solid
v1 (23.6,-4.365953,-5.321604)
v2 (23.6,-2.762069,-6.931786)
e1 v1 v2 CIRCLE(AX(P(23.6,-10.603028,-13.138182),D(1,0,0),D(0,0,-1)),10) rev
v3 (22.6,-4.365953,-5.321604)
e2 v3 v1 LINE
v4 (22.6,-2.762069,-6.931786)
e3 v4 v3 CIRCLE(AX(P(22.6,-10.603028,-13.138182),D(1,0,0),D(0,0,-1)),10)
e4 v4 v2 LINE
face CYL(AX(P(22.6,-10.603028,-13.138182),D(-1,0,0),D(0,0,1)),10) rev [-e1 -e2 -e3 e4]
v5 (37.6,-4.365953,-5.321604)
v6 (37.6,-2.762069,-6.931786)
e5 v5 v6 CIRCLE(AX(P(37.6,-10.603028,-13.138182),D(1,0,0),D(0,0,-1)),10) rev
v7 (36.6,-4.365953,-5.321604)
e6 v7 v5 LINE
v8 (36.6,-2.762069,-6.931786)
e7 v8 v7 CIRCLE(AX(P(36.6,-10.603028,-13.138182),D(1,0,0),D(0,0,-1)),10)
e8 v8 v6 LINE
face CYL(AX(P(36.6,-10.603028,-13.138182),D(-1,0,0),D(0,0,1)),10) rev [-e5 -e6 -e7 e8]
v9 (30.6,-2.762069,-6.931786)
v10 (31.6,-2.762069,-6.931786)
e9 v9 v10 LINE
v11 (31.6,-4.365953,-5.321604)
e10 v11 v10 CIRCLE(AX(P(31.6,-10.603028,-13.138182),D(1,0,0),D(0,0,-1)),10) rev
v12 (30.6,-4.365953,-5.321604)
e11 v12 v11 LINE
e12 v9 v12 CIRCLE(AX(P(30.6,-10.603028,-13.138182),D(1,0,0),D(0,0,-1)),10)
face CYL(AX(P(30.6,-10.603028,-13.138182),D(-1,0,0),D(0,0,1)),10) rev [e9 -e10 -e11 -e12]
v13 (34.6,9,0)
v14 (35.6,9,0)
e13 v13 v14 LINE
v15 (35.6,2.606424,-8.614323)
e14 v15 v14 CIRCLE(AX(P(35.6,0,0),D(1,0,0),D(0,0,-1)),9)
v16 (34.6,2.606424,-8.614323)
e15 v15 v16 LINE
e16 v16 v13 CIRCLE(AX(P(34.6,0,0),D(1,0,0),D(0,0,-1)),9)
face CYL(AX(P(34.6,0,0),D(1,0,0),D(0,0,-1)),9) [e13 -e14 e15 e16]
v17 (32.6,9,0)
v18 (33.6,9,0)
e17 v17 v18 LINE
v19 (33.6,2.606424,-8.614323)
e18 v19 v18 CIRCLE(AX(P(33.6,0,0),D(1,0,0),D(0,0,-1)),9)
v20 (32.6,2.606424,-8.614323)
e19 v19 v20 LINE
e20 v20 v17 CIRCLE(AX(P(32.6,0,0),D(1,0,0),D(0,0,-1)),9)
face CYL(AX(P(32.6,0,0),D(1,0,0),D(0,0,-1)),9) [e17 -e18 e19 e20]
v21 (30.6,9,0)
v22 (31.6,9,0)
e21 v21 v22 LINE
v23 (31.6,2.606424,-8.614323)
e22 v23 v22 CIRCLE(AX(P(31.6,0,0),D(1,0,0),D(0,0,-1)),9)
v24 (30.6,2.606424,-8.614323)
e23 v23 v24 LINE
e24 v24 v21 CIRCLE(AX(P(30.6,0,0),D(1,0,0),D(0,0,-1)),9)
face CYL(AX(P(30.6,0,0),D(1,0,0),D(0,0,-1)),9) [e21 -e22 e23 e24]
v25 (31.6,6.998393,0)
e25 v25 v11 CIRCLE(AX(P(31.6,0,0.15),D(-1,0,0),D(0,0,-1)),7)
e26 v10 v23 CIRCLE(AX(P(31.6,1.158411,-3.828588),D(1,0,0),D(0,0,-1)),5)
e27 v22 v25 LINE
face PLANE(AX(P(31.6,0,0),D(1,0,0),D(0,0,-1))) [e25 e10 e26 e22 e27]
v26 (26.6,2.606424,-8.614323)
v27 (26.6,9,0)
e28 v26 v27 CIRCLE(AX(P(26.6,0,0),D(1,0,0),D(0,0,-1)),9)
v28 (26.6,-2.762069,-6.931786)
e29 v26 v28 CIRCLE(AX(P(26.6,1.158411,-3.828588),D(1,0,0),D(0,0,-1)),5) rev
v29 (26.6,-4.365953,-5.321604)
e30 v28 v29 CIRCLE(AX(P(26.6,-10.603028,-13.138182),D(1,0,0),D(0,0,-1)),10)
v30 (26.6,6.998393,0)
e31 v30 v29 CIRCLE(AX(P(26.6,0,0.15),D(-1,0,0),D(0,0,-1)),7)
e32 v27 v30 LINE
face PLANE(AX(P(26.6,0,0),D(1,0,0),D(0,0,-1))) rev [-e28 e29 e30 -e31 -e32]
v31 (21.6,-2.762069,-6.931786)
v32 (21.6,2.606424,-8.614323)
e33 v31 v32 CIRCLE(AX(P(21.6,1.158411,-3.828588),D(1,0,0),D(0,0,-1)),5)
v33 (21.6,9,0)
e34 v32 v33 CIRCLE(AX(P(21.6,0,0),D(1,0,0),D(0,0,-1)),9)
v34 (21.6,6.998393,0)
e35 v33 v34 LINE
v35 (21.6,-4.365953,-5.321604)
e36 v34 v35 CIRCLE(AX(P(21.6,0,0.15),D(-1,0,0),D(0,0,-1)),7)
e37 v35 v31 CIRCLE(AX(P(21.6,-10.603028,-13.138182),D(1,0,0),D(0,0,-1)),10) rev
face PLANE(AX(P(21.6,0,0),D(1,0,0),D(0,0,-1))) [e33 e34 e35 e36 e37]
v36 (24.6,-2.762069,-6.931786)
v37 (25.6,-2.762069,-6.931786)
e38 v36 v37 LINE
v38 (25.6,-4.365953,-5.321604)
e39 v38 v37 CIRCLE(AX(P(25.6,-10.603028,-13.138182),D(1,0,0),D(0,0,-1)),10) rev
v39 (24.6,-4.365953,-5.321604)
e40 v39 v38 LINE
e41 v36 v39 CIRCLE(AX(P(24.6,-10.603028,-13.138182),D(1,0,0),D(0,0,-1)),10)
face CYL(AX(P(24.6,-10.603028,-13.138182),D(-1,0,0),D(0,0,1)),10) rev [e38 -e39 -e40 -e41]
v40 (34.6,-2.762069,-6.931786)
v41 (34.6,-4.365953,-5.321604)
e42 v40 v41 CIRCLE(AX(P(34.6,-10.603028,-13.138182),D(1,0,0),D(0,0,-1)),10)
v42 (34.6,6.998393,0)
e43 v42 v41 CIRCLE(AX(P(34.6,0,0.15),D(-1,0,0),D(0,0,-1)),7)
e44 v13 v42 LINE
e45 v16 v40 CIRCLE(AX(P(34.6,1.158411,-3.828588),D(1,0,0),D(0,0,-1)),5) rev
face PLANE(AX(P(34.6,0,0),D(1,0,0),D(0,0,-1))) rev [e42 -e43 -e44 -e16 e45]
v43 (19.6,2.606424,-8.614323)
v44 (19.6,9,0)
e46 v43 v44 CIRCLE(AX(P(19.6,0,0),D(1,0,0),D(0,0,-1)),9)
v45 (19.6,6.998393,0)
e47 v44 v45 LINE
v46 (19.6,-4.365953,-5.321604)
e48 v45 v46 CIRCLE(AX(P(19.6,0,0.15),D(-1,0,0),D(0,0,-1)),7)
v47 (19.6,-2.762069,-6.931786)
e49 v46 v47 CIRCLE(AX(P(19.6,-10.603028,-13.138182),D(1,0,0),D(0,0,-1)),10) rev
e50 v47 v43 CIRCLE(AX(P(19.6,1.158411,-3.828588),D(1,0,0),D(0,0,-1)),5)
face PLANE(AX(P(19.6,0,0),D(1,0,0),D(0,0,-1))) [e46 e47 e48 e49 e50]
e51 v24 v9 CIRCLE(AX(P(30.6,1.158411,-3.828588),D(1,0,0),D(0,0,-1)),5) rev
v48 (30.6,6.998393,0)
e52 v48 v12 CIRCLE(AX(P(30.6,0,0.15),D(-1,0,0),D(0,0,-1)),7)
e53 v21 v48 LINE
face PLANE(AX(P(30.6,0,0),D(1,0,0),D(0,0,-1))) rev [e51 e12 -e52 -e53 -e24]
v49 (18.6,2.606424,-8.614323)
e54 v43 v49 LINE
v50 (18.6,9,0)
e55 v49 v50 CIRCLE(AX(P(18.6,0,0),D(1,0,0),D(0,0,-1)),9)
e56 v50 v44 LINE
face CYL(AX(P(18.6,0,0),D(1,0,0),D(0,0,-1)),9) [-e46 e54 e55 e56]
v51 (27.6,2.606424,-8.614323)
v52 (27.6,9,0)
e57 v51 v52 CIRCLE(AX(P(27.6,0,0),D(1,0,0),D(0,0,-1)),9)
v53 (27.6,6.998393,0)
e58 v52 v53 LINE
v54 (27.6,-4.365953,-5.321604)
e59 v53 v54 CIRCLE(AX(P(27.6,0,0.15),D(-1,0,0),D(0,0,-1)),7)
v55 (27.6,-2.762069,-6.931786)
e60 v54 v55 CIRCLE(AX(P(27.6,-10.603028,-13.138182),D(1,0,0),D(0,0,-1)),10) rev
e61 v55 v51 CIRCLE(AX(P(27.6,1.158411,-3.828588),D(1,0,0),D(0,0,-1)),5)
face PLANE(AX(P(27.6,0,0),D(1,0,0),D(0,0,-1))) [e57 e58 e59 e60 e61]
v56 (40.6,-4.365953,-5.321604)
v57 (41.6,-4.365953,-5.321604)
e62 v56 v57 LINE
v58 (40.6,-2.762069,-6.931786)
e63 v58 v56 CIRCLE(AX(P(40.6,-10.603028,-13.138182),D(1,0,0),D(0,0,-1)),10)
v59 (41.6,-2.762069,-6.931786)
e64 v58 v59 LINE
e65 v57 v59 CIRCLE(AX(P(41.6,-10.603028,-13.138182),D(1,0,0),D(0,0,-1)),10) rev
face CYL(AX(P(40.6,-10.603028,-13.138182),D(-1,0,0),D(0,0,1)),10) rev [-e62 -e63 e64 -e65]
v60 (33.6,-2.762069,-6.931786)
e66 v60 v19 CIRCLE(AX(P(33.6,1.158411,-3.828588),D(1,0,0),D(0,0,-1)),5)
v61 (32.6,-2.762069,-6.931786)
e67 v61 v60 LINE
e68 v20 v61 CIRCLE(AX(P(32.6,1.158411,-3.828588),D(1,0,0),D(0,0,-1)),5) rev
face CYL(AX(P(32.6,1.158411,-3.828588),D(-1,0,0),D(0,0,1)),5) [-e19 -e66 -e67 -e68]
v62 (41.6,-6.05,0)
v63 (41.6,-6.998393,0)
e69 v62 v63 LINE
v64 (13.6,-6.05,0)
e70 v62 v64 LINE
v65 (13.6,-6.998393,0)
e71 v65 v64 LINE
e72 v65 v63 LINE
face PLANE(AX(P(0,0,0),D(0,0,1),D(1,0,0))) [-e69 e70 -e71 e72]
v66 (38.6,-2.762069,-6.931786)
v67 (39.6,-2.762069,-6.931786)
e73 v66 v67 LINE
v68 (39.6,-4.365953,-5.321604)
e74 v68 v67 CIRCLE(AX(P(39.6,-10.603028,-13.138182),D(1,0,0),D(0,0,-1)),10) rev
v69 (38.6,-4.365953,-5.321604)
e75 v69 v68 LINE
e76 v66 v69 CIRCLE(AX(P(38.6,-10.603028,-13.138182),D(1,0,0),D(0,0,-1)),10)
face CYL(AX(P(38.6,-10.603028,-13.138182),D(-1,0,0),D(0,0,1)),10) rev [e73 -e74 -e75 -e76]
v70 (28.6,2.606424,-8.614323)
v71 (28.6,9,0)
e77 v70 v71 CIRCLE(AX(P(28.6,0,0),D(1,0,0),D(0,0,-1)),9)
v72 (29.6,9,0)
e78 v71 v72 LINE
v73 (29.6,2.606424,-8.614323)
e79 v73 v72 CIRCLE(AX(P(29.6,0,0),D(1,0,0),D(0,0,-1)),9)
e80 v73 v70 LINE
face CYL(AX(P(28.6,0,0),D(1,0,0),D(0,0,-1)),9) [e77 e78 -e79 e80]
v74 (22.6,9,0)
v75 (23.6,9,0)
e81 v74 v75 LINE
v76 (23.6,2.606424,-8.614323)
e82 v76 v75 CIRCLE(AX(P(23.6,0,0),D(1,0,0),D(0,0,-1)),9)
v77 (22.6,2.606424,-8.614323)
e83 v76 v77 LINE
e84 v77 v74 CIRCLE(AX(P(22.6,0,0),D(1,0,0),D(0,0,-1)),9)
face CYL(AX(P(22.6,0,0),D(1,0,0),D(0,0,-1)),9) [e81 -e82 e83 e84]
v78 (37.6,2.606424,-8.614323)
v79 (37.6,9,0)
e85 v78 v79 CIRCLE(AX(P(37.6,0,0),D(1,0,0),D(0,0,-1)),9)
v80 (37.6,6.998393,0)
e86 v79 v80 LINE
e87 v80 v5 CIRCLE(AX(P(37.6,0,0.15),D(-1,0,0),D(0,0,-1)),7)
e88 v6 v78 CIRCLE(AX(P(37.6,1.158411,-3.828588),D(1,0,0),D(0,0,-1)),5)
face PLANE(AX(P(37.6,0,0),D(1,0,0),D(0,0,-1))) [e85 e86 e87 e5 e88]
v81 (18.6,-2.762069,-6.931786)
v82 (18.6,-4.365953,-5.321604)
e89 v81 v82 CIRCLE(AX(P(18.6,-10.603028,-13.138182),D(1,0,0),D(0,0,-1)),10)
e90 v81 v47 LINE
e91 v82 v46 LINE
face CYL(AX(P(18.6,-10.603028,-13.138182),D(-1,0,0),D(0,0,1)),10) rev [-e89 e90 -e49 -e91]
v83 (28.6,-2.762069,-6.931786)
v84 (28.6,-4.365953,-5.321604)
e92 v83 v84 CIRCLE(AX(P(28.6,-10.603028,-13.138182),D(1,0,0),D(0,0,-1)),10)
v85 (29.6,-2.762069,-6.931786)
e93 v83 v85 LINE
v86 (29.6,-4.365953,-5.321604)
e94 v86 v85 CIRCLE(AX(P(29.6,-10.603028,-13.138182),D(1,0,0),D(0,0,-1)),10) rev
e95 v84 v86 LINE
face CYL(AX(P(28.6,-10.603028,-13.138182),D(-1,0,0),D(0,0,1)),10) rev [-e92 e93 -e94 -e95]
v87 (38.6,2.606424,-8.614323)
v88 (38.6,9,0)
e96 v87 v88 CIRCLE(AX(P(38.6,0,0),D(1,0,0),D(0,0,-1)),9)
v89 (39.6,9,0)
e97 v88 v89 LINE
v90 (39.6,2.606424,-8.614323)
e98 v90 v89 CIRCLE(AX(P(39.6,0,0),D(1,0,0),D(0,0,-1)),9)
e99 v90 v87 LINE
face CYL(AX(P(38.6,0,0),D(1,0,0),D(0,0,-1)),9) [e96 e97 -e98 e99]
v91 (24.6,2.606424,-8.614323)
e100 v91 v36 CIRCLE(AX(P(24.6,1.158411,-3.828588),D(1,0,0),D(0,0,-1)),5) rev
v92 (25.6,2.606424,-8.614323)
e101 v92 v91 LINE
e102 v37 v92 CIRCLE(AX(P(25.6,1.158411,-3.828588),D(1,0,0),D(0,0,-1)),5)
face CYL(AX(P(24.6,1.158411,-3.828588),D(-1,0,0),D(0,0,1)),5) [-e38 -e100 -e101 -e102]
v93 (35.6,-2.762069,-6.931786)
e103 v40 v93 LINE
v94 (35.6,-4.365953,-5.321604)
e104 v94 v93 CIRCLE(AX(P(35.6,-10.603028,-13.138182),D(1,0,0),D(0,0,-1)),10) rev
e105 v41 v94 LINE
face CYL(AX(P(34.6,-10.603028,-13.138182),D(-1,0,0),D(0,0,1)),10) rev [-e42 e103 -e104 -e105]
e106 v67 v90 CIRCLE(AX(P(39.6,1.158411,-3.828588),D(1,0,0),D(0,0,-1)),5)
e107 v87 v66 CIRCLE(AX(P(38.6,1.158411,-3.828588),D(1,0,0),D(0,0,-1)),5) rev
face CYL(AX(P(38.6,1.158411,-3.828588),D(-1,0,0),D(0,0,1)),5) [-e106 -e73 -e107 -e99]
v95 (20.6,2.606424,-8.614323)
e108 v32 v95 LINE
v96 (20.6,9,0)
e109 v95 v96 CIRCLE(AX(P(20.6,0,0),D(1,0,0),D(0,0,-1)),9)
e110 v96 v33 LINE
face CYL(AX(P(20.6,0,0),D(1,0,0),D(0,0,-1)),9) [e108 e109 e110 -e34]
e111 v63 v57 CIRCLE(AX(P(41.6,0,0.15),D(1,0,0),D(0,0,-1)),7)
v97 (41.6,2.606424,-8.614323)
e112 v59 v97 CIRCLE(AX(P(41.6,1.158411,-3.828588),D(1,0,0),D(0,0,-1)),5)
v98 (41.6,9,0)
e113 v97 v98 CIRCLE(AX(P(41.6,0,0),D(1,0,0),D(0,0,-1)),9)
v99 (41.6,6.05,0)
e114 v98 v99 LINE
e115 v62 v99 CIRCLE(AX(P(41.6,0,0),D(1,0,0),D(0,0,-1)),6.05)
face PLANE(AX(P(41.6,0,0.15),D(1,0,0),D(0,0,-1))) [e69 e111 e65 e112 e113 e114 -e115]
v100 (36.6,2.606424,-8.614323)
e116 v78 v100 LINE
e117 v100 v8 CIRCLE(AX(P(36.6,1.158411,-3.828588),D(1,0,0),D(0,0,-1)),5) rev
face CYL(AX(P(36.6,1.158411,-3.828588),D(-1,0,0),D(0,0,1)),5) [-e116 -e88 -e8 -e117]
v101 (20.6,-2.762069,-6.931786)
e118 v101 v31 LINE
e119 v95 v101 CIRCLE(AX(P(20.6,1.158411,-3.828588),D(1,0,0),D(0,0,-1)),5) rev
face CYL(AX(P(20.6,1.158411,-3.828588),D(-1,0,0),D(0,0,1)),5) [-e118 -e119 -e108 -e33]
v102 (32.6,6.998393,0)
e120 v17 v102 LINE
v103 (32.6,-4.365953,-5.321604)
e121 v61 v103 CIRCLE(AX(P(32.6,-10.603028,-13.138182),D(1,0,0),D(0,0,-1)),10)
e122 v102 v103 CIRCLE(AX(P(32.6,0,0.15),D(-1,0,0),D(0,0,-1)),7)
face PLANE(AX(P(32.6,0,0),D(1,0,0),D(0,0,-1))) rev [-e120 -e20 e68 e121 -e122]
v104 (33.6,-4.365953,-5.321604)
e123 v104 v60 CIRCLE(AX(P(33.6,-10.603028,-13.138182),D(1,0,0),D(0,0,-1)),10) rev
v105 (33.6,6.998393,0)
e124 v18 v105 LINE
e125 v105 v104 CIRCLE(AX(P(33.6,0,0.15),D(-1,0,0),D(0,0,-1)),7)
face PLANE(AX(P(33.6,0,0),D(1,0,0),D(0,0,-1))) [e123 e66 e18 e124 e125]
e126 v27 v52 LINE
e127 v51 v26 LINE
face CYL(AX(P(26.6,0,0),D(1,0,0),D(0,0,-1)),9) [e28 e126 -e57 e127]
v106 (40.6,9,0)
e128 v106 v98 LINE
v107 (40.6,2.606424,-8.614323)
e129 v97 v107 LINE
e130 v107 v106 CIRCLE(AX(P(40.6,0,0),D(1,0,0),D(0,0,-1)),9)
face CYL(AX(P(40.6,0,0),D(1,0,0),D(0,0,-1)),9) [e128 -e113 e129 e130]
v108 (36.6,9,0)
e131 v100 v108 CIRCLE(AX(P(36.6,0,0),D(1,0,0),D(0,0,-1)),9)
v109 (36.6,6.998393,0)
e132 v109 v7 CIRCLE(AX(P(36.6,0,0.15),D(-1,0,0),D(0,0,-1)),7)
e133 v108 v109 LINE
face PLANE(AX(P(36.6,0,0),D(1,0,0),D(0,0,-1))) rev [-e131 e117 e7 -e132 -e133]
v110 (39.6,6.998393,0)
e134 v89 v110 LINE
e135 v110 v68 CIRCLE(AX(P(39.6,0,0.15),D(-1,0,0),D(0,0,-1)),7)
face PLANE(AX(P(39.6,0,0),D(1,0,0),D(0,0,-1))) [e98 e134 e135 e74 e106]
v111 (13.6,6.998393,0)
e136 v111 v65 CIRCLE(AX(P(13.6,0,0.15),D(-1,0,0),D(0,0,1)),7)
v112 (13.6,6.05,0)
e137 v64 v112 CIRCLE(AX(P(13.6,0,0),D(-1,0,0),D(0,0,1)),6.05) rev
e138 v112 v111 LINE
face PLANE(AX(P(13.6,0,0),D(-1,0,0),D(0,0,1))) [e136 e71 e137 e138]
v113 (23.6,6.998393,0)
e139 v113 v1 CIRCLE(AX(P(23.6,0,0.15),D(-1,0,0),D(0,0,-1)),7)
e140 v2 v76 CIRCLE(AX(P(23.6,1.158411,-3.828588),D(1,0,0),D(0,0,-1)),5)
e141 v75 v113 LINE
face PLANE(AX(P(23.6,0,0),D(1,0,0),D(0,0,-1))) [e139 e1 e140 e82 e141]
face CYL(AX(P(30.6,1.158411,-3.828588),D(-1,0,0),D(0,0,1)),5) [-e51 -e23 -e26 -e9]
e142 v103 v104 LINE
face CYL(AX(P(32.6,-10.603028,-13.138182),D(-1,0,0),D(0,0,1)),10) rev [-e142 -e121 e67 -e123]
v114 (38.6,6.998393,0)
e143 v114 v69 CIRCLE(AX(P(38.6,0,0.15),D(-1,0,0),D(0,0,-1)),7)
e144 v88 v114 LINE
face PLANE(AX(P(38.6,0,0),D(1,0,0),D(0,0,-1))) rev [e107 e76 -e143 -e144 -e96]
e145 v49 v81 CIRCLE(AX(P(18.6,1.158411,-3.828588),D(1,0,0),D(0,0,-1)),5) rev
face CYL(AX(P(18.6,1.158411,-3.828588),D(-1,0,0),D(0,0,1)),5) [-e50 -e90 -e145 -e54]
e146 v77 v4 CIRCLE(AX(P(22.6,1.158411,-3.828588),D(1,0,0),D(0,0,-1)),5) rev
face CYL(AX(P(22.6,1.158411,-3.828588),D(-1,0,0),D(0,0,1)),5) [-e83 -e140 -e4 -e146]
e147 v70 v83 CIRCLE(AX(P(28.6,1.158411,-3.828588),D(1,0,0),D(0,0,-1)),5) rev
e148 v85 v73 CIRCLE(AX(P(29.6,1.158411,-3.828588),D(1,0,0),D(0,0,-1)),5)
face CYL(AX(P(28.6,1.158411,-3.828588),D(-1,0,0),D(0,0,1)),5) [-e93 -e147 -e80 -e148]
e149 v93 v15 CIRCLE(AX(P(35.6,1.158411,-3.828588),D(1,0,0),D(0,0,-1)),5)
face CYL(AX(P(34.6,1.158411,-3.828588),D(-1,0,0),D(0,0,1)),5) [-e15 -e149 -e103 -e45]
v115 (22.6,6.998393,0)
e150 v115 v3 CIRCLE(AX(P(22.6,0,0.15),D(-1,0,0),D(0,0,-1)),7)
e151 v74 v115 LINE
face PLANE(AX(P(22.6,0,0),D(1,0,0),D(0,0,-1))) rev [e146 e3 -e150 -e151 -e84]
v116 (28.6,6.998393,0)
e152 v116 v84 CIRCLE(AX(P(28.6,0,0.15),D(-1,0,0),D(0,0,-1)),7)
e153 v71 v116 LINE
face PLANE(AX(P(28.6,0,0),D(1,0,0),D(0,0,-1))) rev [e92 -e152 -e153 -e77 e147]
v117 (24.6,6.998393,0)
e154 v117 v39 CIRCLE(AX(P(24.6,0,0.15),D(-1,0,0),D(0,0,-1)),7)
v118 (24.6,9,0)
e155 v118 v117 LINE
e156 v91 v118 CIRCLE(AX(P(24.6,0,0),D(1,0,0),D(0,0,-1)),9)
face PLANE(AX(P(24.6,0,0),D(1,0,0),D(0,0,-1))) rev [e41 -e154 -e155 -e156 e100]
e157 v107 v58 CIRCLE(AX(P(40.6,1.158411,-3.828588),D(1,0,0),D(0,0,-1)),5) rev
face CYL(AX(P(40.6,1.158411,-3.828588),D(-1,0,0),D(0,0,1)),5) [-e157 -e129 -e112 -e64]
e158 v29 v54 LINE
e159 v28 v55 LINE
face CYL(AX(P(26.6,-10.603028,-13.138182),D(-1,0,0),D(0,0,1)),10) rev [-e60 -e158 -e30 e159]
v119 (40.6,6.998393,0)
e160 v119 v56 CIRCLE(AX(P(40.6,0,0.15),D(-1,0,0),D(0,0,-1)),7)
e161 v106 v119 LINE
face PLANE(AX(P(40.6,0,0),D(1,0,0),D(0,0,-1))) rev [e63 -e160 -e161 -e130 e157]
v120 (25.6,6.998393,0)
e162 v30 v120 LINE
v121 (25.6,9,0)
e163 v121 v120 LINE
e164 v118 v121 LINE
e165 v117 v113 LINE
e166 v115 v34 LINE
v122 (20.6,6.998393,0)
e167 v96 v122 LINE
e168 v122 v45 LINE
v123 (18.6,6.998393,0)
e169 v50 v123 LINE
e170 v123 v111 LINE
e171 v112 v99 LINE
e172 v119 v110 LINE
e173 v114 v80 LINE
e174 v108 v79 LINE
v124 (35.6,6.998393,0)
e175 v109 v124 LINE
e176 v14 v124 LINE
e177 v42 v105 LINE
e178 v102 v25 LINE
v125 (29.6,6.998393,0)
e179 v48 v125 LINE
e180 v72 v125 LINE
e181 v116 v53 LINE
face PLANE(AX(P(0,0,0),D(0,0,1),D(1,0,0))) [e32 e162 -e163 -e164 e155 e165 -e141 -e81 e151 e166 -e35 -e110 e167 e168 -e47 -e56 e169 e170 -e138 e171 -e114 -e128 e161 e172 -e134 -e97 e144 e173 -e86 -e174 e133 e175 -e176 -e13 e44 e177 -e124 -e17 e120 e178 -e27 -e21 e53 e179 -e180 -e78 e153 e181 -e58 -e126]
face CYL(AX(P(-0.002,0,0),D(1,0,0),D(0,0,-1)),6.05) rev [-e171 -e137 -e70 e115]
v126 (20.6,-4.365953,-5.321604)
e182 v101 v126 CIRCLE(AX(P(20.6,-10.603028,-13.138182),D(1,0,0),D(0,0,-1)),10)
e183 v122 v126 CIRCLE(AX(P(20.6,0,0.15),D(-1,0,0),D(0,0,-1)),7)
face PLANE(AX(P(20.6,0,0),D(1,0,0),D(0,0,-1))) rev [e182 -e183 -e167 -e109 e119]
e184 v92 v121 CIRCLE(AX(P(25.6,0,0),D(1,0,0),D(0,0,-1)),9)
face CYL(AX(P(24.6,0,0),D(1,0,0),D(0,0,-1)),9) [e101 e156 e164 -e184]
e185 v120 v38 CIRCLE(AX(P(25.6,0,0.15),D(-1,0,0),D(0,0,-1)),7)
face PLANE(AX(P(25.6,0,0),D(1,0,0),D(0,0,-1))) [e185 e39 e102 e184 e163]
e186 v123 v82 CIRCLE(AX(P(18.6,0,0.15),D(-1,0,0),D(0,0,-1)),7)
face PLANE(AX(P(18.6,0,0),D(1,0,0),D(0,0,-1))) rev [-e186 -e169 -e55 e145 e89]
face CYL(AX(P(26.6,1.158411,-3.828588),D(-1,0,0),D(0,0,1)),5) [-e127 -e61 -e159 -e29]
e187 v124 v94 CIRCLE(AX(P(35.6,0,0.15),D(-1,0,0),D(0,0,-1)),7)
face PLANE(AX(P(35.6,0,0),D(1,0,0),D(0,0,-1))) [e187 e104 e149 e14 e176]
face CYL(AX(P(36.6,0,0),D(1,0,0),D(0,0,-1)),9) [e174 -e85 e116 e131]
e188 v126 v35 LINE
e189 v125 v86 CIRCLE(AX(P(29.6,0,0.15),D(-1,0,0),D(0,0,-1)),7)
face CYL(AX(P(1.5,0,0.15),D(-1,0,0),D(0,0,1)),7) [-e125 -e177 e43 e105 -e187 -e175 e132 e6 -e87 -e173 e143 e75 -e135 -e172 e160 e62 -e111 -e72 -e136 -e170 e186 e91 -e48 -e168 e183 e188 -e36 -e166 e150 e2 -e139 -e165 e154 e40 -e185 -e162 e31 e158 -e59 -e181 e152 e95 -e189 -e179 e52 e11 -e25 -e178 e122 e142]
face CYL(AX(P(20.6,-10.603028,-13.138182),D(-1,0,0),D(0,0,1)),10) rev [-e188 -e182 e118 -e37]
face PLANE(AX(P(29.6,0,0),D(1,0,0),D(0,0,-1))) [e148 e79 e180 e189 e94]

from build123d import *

# Parameters (mm, degrees)
SKETCH1_R           = 7
SKETCH1_R_2         = 0.8
SKETCH1_R_3         = 4
BOSS_EXTRUDE1_DEPTH = 1.5
SKETCH2_R           = 7
SKETCH2_R_2         = 6.4
BOSS_EXTRUDE2_DEPTH = 40.1
BOSS_EXTRUDE5_REACH = 44.786
SKETCH12_R          = 6.4
SKETCH12_R_2        = 6.05
BOSS_EXTRUDE7_START = -1
BOSS_EXTRUDE7_DEPTH = 1
FILLET2_R           = 10
FILLET3_R           = 5
LPATTERN1_START     = 18.6
LPATTERN1_DEPTH     = 1
LPATTERN1_START_2   = 20.6
LPATTERN1_2_DEPTH   = 1
LPATTERN1_START_3   = 22.6
LPATTERN1_3_DEPTH   = 1
LPATTERN1_START_4   = 24.6
LPATTERN1_4_DEPTH   = 1
LPATTERN1_START_5   = 26.6
LPATTERN1_5_DEPTH   = 1
LPATTERN1_START_6   = 28.6
LPATTERN1_6_DEPTH   = 1
LPATTERN1_START_7   = 30.6
LPATTERN1_7_DEPTH   = 1
LPATTERN1_START_8   = 32.6
LPATTERN1_8_DEPTH   = 1
LPATTERN1_START_9   = 34.6
LPATTERN1_9_DEPTH   = 1
LPATTERN1_START_10  = 36.6
LPATTERN1_10_DEPTH  = 1
LPATTERN1_START_11  = 38.6
LPATTERN1_11_DEPTH  = 1
SKETCH15_W          = 17.693531028
SKETCH15_H          = 16
SKETCH16_W          = 28
SKETCH16_H          = 16


with BuildPart() as part:
    # Sketch1 → Boss-Extrude1 (new body)
    with BuildSketch(Plane(origin=(0, 0, 0), x_dir=(0, 0, -1), z_dir=(1, 0, 0))):
        with Locations((-0.15, 0)):
            Circle(SKETCH1_R)
        with Locations((0, 5)):
            Circle(SKETCH1_R_2, mode=Mode.SUBTRACT)
        with Locations((-4.330127019, -2.5)):
            Circle(SKETCH1_R_2, mode=Mode.SUBTRACT)
        with Locations((4.330127019, -2.5)):
            Circle(SKETCH1_R_2, mode=Mode.SUBTRACT)
        Circle(SKETCH1_R_3, mode=Mode.SUBTRACT)
    extrude(amount=BOSS_EXTRUDE1_DEPTH)

    # Sketch2 → Boss-Extrude2 (add)
    with BuildSketch(Plane(origin=(1.5, 0, 0), x_dir=(0, 0, -1), z_dir=(1, 0, 0))):
        with Locations((-0.15, 0)):
            Circle(SKETCH2_R)
        with Locations((-0.15, 0)):
            Circle(SKETCH2_R_2, mode=Mode.SUBTRACT)
    extrude(amount=BOSS_EXTRUDE2_DEPTH)

    # Sketch12 → Boss-Extrude5 (add, up to next)
    with BuildSketch(Plane(origin=(41.6, 0, 0), x_dir=(0, 0, -1), z_dir=(1, 0, 0)), mode=Mode.PRIVATE) as boss_extrude5_sk1:
        with Locations((-0.15, 0)):
            Circle(SKETCH12_R)
        Circle(SKETCH12_R_2, mode=Mode.SUBTRACT)
    boss_extrude5_tool1 = extrude(boss_extrude5_sk1.sketch, amount=-BOSS_EXTRUDE5_REACH, mode=Mode.PRIVATE) - part.part
    add(boss_extrude5_tool1.solids().sort_by_distance((41.6, 0, 6.368981))[0])

    # Sketch14 → Boss-Extrude7 (add)
    with BuildSketch(Plane(origin=(41.6, 0, 0), x_dir=(0, 0, -1), z_dir=(1, 0, 0)).offset(BOSS_EXTRUDE7_START)):
        with BuildLine():
            Line((-7.039083492, -1.241180339), (-8.863269777, -1.562833599))
            ThreePointArc((-8.863269777, -1.562833599), (0, 9), (8.863269777, -1.562833599))
            Line((8.863269777, -1.562833599), (6.748129599, -1.189877318))
            ThreePointArc((6.748129599, -1.189877318), (-0.176047227, 6.999951539), (-7.039083492, -1.241180339))
        make_face()
    extrude(amount=BOSS_EXTRUDE7_DEPTH)

    # Fillet2
    # the kernel refuses this fillet: 10 mm, written as the material it adds along each edge
    with BuildSketch(Plane(origin=(40.6, -1.189877318, -6.748129599), x_dir=(0, -0.9122124275498226, 0.40971756982543417), z_dir=(1, 0, 0))) as fillet2_piece_1:
        with BuildLine():
            CenterArc((5.968676638, 9.685818843), FILLET2_R, 229.495547536, 26.104158306)
            Line((-0.526394739, 2.082263897), (-0.656296166, 1.930192799))
            ThreePointArc((-0.656296166, 1.930192799), (-0.457097485, 0.992114146), (-0.193900116, -0.049017803))
            Line((-0.193900116, -0.049017803), (0.049738972, -0.193716377))
            ThreePointArc((0.049738972, -0.193716377), (1.740864019, 0.01992681), (3.431989067, -0.193716377))
            Line((3.431989067, -0.193716377), (3.481728039, 0))
        make_face()
    extrude(amount=1)
    with BuildSketch(Plane(origin=(40.6, -1.241180339, 7.039083492), x_dir=(0, -0.9145376119425217, -0.4045008731047063), z_dir=(1, 0, 0))) as fillet2_piece_2:
        with BuildLine():
            CenterArc((5.662402917, -9.717692138), FILLET2_R, 103.646653122, 23.987142505)
            Line((-0.443720941, -1.798395993), (-0.565843418, -1.64001007))
            ThreePointArc((-0.565843418, -1.64001007), (-0.416037384, -0.851288435), (-0.194176914, 0.047909561))
            Line((-0.194176914, 0.047909561), (0.047186691, 0.194353843))
            ThreePointArc((0.047186691, 0.194353843), (1.651534184, 0.002384497), (3.255881677, 0.194353843))
            Line((3.255881677, 0.194353843), (3.303068368, 0))
        make_face()
    extrude(amount=1)

    # Fillet3
    fillet3_edges = [part.edges().sort_by_distance(p)[0] for p in [
        (41.1, -1.562833599, 8.863269777),
        (41.1, -1.562833599, -8.863269777),
    ]]
    fillet(fillet3_edges, radius=FILLET3_R)

    # LPattern1: read off the stored shape, not the designer's step
    # LPattern1 outline → LPattern1 (add)
    with BuildSketch(Plane.YZ.offset(LPATTERN1_START)):
        with BuildLine():
            ThreePointArc((-2.762069023, -6.931785952), (-0.336916962, -8.599750686), (2.606424088, -8.614322578))
            ThreePointArc((2.606424088, -8.614322578), (8.998759062, 0.149450112), (2.31893468, 8.696122236))
            ThreePointArc((2.31893468, 8.696122236), (-0.448823677, 8.641049813), (-2.763066821, 7.121905987))
            ThreePointArc((-2.763066821, 7.121905987), (-3.475808056, 6.373673153), (-4.261960597, 5.702989453))
            ThreePointArc((-4.261960597, 5.702989453), (6.999688602, 0.083973644), (-4.365952904, -5.321604449))
            ThreePointArc((-4.365952904, -5.321604449), (-3.518119256, -6.080982981), (-2.762069023, -6.931785952))
        make_face()
    extrude(amount=LPATTERN1_DEPTH)

    # LPattern1 2 outline → LPattern1 2 (add)
    with BuildSketch(Plane.YZ.offset(LPATTERN1_START_2)):
        with BuildLine():
            ThreePointArc((-2.762069023, -6.931785952), (-0.336916962, -8.599750686), (2.606424088, -8.614322578))
            ThreePointArc((2.606424088, -8.614322578), (8.998759062, 0.149450112), (2.31893468, 8.696122236))
            ThreePointArc((2.31893468, 8.696122236), (-0.448823677, 8.641049813), (-2.763066821, 7.121905987))
            ThreePointArc((-2.763066821, 7.121905987), (-3.475808056, 6.373673153), (-4.261960597, 5.702989453))
            ThreePointArc((-4.261960597, 5.702989453), (6.999688602, 0.083973644), (-4.365952904, -5.321604449))
            ThreePointArc((-4.365952904, -5.321604449), (-3.518119256, -6.080982981), (-2.762069023, -6.931785952))
        make_face()
    extrude(amount=LPATTERN1_2_DEPTH)

    # LPattern1 3 outline → LPattern1 3 (add)
    with BuildSketch(Plane.YZ.offset(LPATTERN1_START_3)):
        with BuildLine():
            ThreePointArc((-2.762069023, -6.931785952), (-0.336916962, -8.599750686), (2.606424088, -8.614322578))
            ThreePointArc((2.606424088, -8.614322578), (8.998759062, 0.149450112), (2.31893468, 8.696122236))
            ThreePointArc((2.31893468, 8.696122236), (-0.448823677, 8.641049813), (-2.763066821, 7.121905987))
            ThreePointArc((-2.763066821, 7.121905987), (-3.475808056, 6.373673153), (-4.261960597, 5.702989453))
            ThreePointArc((-4.261960597, 5.702989453), (6.999688602, 0.083973644), (-4.365952904, -5.321604449))
            ThreePointArc((-4.365952904, -5.321604449), (-3.518119256, -6.080982981), (-2.762069023, -6.931785952))
        make_face()
    extrude(amount=LPATTERN1_3_DEPTH)

    # LPattern1 4 outline → LPattern1 4 (add)
    with BuildSketch(Plane.YZ.offset(LPATTERN1_START_4)):
        with BuildLine():
            ThreePointArc((-2.762069023, -6.931785952), (-0.336916962, -8.599750686), (2.606424088, -8.614322578))
            ThreePointArc((2.606424088, -8.614322578), (8.998759062, 0.149450112), (2.31893468, 8.696122236))
            ThreePointArc((2.31893468, 8.696122236), (-0.448823677, 8.641049813), (-2.763066821, 7.121905987))
            ThreePointArc((-2.763066821, 7.121905987), (-3.475808056, 6.373673153), (-4.261960597, 5.702989453))
            ThreePointArc((-4.261960597, 5.702989453), (6.999688602, 0.083973644), (-4.365952904, -5.321604449))
            ThreePointArc((-4.365952904, -5.321604449), (-3.518119256, -6.080982981), (-2.762069023, -6.931785952))
        make_face()
    extrude(amount=LPATTERN1_4_DEPTH)

    # LPattern1 5 outline → LPattern1 5 (add)
    with BuildSketch(Plane.YZ.offset(LPATTERN1_START_5)):
        with BuildLine():
            ThreePointArc((-2.762069023, -6.931785952), (-0.336916962, -8.599750686), (2.606424088, -8.614322578))
            ThreePointArc((2.606424088, -8.614322578), (8.998759062, 0.149450112), (2.31893468, 8.696122236))
            ThreePointArc((2.31893468, 8.696122236), (-0.448823677, 8.641049813), (-2.763066821, 7.121905987))
            ThreePointArc((-2.763066821, 7.121905987), (-3.475808056, 6.373673153), (-4.261960597, 5.702989453))
            ThreePointArc((-4.261960597, 5.702989453), (6.999688602, 0.083973644), (-4.365952904, -5.321604449))
            ThreePointArc((-4.365952904, -5.321604449), (-3.518119256, -6.080982981), (-2.762069023, -6.931785952))
        make_face()
    extrude(amount=LPATTERN1_5_DEPTH)

    # LPattern1 6 outline → LPattern1 6 (add)
    with BuildSketch(Plane.YZ.offset(LPATTERN1_START_6)):
        with BuildLine():
            ThreePointArc((-2.762069023, -6.931785952), (-0.336916962, -8.599750686), (2.606424088, -8.614322578))
            ThreePointArc((2.606424088, -8.614322578), (8.998759062, 0.149450112), (2.31893468, 8.696122236))
            ThreePointArc((2.31893468, 8.696122236), (-0.448823677, 8.641049813), (-2.763066821, 7.121905987))
            ThreePointArc((-2.763066821, 7.121905987), (-3.475808056, 6.373673153), (-4.261960597, 5.702989453))
            ThreePointArc((-4.261960597, 5.702989453), (6.999688602, 0.083973644), (-4.365952904, -5.321604449))
            ThreePointArc((-4.365952904, -5.321604449), (-3.518119256, -6.080982981), (-2.762069023, -6.931785952))
        make_face()
    extrude(amount=LPATTERN1_6_DEPTH)

    # LPattern1 7 outline → LPattern1 7 (add)
    with BuildSketch(Plane.YZ.offset(LPATTERN1_START_7)):
        with BuildLine():
            ThreePointArc((-2.762069023, -6.931785952), (-0.336916962, -8.599750686), (2.606424088, -8.614322578))
            ThreePointArc((2.606424088, -8.614322578), (8.998759062, 0.149450112), (2.31893468, 8.696122236))
            ThreePointArc((2.31893468, 8.696122236), (-0.448823677, 8.641049813), (-2.763066821, 7.121905987))
            ThreePointArc((-2.763066821, 7.121905987), (-3.475808056, 6.373673153), (-4.261960597, 5.702989453))
            ThreePointArc((-4.261960597, 5.702989453), (6.999688602, 0.083973644), (-4.365952904, -5.321604449))
            ThreePointArc((-4.365952904, -5.321604449), (-3.518119256, -6.080982981), (-2.762069023, -6.931785952))
        make_face()
    extrude(amount=LPATTERN1_7_DEPTH)

    # LPattern1 8 outline → LPattern1 8 (add)
    with BuildSketch(Plane.YZ.offset(LPATTERN1_START_8)):
        with BuildLine():
            ThreePointArc((-2.762069023, -6.931785952), (-0.336916962, -8.599750686), (2.606424088, -8.614322578))
            ThreePointArc((2.606424088, -8.614322578), (8.998759062, 0.149450112), (2.31893468, 8.696122236))
            ThreePointArc((2.31893468, 8.696122236), (-0.448823677, 8.641049813), (-2.763066821, 7.121905987))
            ThreePointArc((-2.763066821, 7.121905987), (-3.475808056, 6.373673153), (-4.261960597, 5.702989453))
            ThreePointArc((-4.261960597, 5.702989453), (6.999688602, 0.083973644), (-4.365952904, -5.321604449))
            ThreePointArc((-4.365952904, -5.321604449), (-3.518119256, -6.080982981), (-2.762069023, -6.931785952))
        make_face()
    extrude(amount=LPATTERN1_8_DEPTH)

    # LPattern1 9 outline → LPattern1 9 (add)
    with BuildSketch(Plane.YZ.offset(LPATTERN1_START_9)):
        with BuildLine():
            ThreePointArc((-2.762069023, -6.931785952), (-0.336916962, -8.599750686), (2.606424088, -8.614322578))
            ThreePointArc((2.606424088, -8.614322578), (8.998759062, 0.149450112), (2.31893468, 8.696122236))
            ThreePointArc((2.31893468, 8.696122236), (-0.448823677, 8.641049813), (-2.763066821, 7.121905987))
            ThreePointArc((-2.763066821, 7.121905987), (-3.475808056, 6.373673153), (-4.261960597, 5.702989453))
            ThreePointArc((-4.261960597, 5.702989453), (6.999688602, 0.083973644), (-4.365952904, -5.321604449))
            ThreePointArc((-4.365952904, -5.321604449), (-3.518119256, -6.080982981), (-2.762069023, -6.931785952))
        make_face()
    extrude(amount=LPATTERN1_9_DEPTH)

    # LPattern1 10 outline → LPattern1 10 (add)
    with BuildSketch(Plane.YZ.offset(LPATTERN1_START_10)):
        with BuildLine():
            ThreePointArc((-2.762069023, -6.931785952), (-0.336916962, -8.599750686), (2.606424088, -8.614322578))
            ThreePointArc((2.606424088, -8.614322578), (8.998759062, 0.149450112), (2.31893468, 8.696122236))
            ThreePointArc((2.31893468, 8.696122236), (-0.448823677, 8.641049813), (-2.763066821, 7.121905987))
            ThreePointArc((-2.763066821, 7.121905987), (-3.475808056, 6.373673153), (-4.261960597, 5.702989453))
            ThreePointArc((-4.261960597, 5.702989453), (6.999688602, 0.083973644), (-4.365952904, -5.321604449))
            ThreePointArc((-4.365952904, -5.321604449), (-3.518119256, -6.080982981), (-2.762069023, -6.931785952))
        make_face()
    extrude(amount=LPATTERN1_10_DEPTH)

    # LPattern1 11 outline → LPattern1 11 (add)
    with BuildSketch(Plane.YZ.offset(LPATTERN1_START_11)):
        with BuildLine():
            ThreePointArc((-2.762069023, -6.931785952), (-0.336916962, -8.599750686), (2.606424088, -8.614322578))
            ThreePointArc((2.606424088, -8.614322578), (8.998759062, 0.149450112), (2.31893468, 8.696122236))
            ThreePointArc((2.31893468, 8.696122236), (-0.448823677, 8.641049813), (-2.763066821, 7.121905987))
            ThreePointArc((-2.763066821, 7.121905987), (-3.475808056, 6.373673153), (-4.261960597, 5.702989453))
            ThreePointArc((-4.261960597, 5.702989453), (6.999688602, 0.083973644), (-4.365952904, -5.321604449))
            ThreePointArc((-4.365952904, -5.321604449), (-3.518119256, -6.080982981), (-2.762069023, -6.931785952))
        make_face()
    extrude(amount=LPATTERN1_11_DEPTH)


with BuildPart() as body_2:
    # Split2: the piece behind the surface
    add(part.part)
    # Sketch15 → Surface-Plane1: a flat surface bounded by the sketch
    with BuildSketch(Plane.ZY.offset(-13.6), mode=Mode.PRIVATE) as surface_plane1_1_region:
        with Locations((0.018177702, 1)):
            Rectangle(SKETCH15_W, SKETCH15_H)
    surface_plane1_1 = surface_plane1_1_region.sketch.faces()[0]
    split(bisect_by=surface_plane1_1, keep=Keep.BOTTOM)


with BuildPart() as part_1:
    add(part.part)

    # Split2: split by a surface, the side it looks to stays
    # Sketch15 → Surface-Plane1: a flat surface bounded by the sketch
    with BuildSketch(Plane.ZY.offset(-13.6), mode=Mode.PRIVATE) as surface_plane1_2_region:
        with Locations((0.018177702, 1)):
            Rectangle(SKETCH15_W, SKETCH15_H)
    surface_plane1_2 = surface_plane1_2_region.sketch.faces()[0]
    split(bisect_by=surface_plane1_2, keep=Keep.TOP)


with BuildPart() as body_2_2:
    # Split3: the piece behind the surface
    add(body_2.part)
    # Sketch16 → Surface-Plane2: a flat surface bounded by the sketch
    with BuildSketch(Plane.XY, mode=Mode.PRIVATE) as surface_plane2_3_region:
        with Locations((27.6, 1)):
            Rectangle(SKETCH16_W, SKETCH16_H)
    surface_plane2_3 = surface_plane2_3_region.sketch.faces()[0]
    split(bisect_by=surface_plane2_3, keep=Keep.BOTTOM)


with BuildPart() as body_2_1:
    add(body_2.part)

    # Split3: split by a surface, the side it looks to stays
    # Sketch16 → Surface-Plane2: a flat surface bounded by the sketch
    with BuildSketch(Plane.XY, mode=Mode.PRIVATE) as surface_plane2_4_region:
        with Locations((27.6, 1)):
            Rectangle(SKETCH16_W, SKETCH16_H)
    surface_plane2_4 = surface_plane2_4_region.sketch.faces()[0]
    split(bisect_by=surface_plane2_4, keep=Keep.TOP)


solid = body_2_2.part
